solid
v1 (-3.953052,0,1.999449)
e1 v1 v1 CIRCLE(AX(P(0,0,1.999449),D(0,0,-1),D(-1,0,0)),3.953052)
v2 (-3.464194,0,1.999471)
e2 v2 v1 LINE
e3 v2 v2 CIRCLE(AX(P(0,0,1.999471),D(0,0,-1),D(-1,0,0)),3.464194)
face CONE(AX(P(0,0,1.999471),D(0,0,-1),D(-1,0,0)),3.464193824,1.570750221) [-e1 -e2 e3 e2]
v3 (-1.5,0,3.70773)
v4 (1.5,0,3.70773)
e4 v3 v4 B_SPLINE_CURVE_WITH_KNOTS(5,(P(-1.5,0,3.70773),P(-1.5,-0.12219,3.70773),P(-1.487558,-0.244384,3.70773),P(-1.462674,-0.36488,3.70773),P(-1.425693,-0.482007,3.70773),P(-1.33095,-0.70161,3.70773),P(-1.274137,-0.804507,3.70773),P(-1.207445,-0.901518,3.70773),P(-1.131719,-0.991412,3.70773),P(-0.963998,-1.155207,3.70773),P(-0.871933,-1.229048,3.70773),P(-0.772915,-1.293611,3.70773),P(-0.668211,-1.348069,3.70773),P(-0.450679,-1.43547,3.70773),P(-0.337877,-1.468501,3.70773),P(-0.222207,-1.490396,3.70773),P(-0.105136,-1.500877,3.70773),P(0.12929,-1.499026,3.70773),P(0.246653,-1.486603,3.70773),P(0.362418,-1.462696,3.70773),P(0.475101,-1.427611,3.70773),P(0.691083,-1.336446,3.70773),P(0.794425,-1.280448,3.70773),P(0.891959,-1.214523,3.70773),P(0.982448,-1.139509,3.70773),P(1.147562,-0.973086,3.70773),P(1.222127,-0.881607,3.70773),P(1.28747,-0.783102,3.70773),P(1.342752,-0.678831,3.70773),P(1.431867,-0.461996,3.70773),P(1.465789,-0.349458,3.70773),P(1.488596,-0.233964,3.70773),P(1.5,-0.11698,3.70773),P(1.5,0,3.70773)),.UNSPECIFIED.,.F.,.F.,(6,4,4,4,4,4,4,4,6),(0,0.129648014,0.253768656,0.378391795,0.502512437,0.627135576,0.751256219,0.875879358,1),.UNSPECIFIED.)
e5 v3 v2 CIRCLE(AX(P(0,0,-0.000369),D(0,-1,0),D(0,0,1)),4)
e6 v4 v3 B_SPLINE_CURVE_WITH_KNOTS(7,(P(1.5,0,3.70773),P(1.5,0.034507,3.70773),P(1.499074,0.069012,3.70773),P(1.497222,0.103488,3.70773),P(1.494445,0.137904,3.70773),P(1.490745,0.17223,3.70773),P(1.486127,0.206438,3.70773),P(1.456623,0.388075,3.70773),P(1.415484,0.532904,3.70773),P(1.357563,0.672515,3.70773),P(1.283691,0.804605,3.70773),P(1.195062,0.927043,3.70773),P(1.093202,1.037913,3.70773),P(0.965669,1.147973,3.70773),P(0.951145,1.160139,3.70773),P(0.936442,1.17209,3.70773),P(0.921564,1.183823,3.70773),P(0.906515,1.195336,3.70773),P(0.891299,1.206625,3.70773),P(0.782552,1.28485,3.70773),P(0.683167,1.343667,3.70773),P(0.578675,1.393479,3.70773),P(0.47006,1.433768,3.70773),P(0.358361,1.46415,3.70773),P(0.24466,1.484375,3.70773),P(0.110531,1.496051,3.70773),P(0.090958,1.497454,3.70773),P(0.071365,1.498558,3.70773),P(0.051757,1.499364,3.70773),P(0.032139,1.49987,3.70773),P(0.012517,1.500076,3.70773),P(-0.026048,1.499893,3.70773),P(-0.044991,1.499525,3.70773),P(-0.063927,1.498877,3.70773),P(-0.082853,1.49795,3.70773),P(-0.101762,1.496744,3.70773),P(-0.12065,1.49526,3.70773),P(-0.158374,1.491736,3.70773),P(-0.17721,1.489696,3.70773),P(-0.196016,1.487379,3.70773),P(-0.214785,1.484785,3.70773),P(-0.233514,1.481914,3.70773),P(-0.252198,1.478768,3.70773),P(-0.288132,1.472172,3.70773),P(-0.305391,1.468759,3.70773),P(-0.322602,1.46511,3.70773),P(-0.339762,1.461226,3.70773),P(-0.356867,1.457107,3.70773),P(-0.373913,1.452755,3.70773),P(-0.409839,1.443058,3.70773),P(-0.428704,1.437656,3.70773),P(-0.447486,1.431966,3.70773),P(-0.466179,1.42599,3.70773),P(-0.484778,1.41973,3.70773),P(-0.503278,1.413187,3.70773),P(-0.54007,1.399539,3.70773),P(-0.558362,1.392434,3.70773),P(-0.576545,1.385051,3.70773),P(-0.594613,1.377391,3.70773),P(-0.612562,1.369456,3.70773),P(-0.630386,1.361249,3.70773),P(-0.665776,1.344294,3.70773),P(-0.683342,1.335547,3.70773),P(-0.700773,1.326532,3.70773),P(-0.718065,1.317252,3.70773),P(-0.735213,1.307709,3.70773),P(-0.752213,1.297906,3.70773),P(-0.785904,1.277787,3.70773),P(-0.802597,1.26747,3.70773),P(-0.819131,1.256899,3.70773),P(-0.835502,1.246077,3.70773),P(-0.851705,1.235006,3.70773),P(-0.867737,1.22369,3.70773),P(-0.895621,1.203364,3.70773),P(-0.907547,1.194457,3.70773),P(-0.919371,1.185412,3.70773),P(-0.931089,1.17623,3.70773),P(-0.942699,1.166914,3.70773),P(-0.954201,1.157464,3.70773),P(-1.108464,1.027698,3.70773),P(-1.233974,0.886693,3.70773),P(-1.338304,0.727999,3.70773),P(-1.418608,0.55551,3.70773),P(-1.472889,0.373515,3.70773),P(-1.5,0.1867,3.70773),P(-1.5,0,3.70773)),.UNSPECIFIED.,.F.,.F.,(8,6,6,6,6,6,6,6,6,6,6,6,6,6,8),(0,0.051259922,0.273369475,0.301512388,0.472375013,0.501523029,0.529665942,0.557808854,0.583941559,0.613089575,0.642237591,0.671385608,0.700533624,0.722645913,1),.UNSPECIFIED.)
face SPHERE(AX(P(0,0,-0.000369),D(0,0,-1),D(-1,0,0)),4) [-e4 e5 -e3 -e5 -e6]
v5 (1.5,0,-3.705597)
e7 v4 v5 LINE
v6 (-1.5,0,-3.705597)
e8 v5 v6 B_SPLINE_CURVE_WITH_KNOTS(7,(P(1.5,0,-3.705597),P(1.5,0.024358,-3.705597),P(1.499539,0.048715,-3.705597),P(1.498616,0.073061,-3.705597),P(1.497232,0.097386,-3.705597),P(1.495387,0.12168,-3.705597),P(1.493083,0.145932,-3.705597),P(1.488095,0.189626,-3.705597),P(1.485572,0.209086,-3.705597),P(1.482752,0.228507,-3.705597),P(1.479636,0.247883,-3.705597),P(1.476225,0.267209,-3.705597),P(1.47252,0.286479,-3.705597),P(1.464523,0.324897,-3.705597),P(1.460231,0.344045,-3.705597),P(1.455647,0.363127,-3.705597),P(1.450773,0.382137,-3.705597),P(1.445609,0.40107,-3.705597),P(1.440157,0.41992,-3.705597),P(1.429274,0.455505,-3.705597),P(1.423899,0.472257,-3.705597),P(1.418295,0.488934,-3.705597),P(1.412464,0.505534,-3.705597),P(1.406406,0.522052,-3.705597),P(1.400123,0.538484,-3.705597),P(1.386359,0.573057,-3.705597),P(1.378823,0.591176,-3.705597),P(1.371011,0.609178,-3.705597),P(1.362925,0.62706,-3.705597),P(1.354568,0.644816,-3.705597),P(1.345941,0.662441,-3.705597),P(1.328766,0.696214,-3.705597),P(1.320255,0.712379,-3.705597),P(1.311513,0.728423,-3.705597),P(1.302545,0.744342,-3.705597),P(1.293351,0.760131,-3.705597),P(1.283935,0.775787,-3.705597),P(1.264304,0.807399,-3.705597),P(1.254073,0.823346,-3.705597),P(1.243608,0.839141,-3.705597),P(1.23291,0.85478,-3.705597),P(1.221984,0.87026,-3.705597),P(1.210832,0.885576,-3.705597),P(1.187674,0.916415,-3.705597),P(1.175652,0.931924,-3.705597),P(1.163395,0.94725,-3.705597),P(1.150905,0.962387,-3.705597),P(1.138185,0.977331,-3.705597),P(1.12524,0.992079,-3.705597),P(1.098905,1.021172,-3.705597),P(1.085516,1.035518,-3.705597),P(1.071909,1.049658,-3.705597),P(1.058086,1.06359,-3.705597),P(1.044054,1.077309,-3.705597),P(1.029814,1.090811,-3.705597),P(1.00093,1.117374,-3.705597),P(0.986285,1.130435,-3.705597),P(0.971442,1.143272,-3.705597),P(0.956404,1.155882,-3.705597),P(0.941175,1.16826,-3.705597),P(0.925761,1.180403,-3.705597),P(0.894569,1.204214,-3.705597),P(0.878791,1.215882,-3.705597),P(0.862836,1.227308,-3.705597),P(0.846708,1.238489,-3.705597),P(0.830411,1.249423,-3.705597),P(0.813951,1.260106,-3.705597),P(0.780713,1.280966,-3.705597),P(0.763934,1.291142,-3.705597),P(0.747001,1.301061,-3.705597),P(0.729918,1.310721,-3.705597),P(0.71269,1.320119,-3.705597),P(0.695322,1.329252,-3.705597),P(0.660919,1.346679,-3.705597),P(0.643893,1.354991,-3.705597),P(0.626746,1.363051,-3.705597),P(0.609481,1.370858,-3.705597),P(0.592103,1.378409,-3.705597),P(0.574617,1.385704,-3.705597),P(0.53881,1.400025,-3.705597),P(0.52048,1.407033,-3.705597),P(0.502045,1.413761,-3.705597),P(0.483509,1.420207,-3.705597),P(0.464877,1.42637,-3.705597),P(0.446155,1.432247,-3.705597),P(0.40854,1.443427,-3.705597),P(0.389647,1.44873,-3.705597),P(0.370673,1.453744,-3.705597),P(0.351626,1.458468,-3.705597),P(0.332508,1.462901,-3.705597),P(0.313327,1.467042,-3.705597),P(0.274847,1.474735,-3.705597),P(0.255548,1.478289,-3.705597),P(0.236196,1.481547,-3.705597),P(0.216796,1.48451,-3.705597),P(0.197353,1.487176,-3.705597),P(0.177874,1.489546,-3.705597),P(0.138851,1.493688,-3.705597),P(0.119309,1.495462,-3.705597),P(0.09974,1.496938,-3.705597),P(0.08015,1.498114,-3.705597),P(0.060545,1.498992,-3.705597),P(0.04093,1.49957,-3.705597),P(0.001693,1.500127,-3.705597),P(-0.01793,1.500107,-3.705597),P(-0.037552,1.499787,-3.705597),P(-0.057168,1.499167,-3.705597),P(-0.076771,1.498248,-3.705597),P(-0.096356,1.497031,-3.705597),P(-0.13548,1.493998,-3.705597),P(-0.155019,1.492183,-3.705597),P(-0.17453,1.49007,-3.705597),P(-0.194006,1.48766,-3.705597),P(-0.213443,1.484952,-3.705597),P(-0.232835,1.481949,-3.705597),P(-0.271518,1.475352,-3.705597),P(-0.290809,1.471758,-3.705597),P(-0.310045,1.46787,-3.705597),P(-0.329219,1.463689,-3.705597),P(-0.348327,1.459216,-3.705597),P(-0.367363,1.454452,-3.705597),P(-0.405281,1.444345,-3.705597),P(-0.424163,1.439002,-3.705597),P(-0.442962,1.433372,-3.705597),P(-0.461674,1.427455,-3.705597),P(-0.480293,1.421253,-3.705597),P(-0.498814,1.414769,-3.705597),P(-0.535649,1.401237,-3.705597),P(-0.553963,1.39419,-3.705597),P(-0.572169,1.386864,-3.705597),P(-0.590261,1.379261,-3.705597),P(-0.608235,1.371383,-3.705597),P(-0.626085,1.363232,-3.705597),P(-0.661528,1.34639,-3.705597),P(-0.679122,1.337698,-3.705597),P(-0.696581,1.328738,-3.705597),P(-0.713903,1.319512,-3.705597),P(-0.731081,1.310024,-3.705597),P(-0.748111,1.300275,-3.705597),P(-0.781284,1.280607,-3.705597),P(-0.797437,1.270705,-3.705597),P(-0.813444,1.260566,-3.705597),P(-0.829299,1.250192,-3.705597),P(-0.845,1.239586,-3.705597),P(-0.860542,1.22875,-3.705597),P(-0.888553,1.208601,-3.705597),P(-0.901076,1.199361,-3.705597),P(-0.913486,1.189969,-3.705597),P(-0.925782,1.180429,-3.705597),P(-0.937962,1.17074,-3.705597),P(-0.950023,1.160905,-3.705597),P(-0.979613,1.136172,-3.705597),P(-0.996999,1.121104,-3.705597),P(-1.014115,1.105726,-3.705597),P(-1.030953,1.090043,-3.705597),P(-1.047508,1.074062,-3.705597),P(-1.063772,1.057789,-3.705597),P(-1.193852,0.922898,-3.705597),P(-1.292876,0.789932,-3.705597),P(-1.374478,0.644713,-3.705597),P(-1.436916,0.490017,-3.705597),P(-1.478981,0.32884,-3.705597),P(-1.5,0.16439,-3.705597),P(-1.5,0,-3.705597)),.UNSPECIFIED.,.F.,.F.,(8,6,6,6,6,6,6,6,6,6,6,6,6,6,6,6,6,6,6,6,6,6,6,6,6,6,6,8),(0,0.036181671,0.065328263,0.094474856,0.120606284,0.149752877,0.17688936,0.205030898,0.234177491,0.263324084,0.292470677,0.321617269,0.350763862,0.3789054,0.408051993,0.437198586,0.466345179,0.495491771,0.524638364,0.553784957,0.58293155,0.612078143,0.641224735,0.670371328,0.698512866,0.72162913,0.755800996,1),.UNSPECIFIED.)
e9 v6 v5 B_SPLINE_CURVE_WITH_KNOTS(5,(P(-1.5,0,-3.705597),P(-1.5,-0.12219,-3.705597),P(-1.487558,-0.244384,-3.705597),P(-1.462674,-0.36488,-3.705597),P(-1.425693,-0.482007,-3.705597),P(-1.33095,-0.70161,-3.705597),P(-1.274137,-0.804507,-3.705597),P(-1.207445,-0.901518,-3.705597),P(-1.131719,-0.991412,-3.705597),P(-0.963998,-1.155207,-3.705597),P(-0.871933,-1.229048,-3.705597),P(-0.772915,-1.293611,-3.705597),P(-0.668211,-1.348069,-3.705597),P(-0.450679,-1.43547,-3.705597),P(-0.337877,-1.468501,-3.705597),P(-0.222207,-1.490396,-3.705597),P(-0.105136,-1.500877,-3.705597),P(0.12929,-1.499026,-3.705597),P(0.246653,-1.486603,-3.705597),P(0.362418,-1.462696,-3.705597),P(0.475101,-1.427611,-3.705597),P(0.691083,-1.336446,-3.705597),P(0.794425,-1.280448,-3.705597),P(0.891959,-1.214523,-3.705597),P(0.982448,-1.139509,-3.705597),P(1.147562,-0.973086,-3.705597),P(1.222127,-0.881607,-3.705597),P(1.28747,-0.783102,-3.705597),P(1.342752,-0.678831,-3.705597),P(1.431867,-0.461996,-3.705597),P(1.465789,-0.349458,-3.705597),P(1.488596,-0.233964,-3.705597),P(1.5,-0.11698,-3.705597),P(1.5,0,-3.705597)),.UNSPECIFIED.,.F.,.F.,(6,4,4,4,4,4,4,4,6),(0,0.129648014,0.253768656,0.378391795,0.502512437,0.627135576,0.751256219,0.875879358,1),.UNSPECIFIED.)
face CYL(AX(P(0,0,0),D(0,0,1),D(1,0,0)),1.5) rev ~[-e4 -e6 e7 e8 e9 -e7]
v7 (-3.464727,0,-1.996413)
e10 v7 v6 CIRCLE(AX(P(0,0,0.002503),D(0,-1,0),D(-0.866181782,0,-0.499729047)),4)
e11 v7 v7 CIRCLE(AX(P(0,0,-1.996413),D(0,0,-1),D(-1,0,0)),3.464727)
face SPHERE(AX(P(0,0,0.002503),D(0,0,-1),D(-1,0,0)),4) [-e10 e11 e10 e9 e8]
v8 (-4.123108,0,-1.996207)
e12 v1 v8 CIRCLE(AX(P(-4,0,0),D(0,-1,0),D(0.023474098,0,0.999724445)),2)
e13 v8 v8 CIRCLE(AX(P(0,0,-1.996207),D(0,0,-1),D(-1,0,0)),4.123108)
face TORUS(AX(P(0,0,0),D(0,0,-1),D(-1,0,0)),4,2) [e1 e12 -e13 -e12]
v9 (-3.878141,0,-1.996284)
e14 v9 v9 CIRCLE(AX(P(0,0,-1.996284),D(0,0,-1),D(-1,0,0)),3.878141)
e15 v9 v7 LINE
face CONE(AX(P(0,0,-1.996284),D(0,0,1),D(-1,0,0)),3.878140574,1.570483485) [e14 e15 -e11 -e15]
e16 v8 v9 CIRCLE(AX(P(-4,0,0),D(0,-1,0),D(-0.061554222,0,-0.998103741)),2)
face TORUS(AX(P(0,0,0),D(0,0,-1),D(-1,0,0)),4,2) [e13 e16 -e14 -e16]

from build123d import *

# Parameters (mm, degrees)
F2_R          = 1.5
F3_DEPTH      = 3.998497265
F3_DEPTH_BACK = 4.0006311494


with BuildPart() as f1:
    # F0 (on Front) → F1 (revolve)
    with BuildSketch(Plane.XZ):
        with BuildLine():
            Line((-3.878140574, -1.9962841181), (-3.4647271293, -1.9964134512))
            ThreePointArc((-3.4647271293, -1.9964134512), (-2.0005418335, -3.4612859959), (0, -3.997497265))
            Line((0, -3.997497265), (0, 3.9996311494))
            ThreePointArc((0, 3.9996311494), (-2.000079858, 3.4636866573), (-3.4641938241, 1.9994714302))
            Line((-3.4641938241, 1.9994714302), (-3.9530518044, 1.9994488908))
            ThreePointArc((-3.9530518044, 1.9994488908), (-5.9981910715, 0.0850437646), (-4.1231084445, -1.9962074819))
            Line((-4.1231084445, -1.9962074819), (-3.878140574, -1.9962841181))
        make_face()
        with BuildLine():
            ThreePointArc((-4.1231084445, -1.9962074819), (-4.0006256837, -1.9999999021), (-3.878140574, -1.9962841181))
            Line((-3.878140574, -1.9962841181), (-4.1231084445, -1.9962074819))
        make_face()
    revolve(axis=Axis((0, 0, 0.0010669422), (0, 0, -1)))

    # F2 (on Top) → F3 (cut, two sides)
    with BuildSketch(Plane.XY) as f3_sk:
        Circle(F2_R)
    extrude(amount=-F3_DEPTH, mode=Mode.SUBTRACT)
    extrude(f3_sk.sketch, amount=F3_DEPTH_BACK, mode=Mode.SUBTRACT)


solid = f1.part
